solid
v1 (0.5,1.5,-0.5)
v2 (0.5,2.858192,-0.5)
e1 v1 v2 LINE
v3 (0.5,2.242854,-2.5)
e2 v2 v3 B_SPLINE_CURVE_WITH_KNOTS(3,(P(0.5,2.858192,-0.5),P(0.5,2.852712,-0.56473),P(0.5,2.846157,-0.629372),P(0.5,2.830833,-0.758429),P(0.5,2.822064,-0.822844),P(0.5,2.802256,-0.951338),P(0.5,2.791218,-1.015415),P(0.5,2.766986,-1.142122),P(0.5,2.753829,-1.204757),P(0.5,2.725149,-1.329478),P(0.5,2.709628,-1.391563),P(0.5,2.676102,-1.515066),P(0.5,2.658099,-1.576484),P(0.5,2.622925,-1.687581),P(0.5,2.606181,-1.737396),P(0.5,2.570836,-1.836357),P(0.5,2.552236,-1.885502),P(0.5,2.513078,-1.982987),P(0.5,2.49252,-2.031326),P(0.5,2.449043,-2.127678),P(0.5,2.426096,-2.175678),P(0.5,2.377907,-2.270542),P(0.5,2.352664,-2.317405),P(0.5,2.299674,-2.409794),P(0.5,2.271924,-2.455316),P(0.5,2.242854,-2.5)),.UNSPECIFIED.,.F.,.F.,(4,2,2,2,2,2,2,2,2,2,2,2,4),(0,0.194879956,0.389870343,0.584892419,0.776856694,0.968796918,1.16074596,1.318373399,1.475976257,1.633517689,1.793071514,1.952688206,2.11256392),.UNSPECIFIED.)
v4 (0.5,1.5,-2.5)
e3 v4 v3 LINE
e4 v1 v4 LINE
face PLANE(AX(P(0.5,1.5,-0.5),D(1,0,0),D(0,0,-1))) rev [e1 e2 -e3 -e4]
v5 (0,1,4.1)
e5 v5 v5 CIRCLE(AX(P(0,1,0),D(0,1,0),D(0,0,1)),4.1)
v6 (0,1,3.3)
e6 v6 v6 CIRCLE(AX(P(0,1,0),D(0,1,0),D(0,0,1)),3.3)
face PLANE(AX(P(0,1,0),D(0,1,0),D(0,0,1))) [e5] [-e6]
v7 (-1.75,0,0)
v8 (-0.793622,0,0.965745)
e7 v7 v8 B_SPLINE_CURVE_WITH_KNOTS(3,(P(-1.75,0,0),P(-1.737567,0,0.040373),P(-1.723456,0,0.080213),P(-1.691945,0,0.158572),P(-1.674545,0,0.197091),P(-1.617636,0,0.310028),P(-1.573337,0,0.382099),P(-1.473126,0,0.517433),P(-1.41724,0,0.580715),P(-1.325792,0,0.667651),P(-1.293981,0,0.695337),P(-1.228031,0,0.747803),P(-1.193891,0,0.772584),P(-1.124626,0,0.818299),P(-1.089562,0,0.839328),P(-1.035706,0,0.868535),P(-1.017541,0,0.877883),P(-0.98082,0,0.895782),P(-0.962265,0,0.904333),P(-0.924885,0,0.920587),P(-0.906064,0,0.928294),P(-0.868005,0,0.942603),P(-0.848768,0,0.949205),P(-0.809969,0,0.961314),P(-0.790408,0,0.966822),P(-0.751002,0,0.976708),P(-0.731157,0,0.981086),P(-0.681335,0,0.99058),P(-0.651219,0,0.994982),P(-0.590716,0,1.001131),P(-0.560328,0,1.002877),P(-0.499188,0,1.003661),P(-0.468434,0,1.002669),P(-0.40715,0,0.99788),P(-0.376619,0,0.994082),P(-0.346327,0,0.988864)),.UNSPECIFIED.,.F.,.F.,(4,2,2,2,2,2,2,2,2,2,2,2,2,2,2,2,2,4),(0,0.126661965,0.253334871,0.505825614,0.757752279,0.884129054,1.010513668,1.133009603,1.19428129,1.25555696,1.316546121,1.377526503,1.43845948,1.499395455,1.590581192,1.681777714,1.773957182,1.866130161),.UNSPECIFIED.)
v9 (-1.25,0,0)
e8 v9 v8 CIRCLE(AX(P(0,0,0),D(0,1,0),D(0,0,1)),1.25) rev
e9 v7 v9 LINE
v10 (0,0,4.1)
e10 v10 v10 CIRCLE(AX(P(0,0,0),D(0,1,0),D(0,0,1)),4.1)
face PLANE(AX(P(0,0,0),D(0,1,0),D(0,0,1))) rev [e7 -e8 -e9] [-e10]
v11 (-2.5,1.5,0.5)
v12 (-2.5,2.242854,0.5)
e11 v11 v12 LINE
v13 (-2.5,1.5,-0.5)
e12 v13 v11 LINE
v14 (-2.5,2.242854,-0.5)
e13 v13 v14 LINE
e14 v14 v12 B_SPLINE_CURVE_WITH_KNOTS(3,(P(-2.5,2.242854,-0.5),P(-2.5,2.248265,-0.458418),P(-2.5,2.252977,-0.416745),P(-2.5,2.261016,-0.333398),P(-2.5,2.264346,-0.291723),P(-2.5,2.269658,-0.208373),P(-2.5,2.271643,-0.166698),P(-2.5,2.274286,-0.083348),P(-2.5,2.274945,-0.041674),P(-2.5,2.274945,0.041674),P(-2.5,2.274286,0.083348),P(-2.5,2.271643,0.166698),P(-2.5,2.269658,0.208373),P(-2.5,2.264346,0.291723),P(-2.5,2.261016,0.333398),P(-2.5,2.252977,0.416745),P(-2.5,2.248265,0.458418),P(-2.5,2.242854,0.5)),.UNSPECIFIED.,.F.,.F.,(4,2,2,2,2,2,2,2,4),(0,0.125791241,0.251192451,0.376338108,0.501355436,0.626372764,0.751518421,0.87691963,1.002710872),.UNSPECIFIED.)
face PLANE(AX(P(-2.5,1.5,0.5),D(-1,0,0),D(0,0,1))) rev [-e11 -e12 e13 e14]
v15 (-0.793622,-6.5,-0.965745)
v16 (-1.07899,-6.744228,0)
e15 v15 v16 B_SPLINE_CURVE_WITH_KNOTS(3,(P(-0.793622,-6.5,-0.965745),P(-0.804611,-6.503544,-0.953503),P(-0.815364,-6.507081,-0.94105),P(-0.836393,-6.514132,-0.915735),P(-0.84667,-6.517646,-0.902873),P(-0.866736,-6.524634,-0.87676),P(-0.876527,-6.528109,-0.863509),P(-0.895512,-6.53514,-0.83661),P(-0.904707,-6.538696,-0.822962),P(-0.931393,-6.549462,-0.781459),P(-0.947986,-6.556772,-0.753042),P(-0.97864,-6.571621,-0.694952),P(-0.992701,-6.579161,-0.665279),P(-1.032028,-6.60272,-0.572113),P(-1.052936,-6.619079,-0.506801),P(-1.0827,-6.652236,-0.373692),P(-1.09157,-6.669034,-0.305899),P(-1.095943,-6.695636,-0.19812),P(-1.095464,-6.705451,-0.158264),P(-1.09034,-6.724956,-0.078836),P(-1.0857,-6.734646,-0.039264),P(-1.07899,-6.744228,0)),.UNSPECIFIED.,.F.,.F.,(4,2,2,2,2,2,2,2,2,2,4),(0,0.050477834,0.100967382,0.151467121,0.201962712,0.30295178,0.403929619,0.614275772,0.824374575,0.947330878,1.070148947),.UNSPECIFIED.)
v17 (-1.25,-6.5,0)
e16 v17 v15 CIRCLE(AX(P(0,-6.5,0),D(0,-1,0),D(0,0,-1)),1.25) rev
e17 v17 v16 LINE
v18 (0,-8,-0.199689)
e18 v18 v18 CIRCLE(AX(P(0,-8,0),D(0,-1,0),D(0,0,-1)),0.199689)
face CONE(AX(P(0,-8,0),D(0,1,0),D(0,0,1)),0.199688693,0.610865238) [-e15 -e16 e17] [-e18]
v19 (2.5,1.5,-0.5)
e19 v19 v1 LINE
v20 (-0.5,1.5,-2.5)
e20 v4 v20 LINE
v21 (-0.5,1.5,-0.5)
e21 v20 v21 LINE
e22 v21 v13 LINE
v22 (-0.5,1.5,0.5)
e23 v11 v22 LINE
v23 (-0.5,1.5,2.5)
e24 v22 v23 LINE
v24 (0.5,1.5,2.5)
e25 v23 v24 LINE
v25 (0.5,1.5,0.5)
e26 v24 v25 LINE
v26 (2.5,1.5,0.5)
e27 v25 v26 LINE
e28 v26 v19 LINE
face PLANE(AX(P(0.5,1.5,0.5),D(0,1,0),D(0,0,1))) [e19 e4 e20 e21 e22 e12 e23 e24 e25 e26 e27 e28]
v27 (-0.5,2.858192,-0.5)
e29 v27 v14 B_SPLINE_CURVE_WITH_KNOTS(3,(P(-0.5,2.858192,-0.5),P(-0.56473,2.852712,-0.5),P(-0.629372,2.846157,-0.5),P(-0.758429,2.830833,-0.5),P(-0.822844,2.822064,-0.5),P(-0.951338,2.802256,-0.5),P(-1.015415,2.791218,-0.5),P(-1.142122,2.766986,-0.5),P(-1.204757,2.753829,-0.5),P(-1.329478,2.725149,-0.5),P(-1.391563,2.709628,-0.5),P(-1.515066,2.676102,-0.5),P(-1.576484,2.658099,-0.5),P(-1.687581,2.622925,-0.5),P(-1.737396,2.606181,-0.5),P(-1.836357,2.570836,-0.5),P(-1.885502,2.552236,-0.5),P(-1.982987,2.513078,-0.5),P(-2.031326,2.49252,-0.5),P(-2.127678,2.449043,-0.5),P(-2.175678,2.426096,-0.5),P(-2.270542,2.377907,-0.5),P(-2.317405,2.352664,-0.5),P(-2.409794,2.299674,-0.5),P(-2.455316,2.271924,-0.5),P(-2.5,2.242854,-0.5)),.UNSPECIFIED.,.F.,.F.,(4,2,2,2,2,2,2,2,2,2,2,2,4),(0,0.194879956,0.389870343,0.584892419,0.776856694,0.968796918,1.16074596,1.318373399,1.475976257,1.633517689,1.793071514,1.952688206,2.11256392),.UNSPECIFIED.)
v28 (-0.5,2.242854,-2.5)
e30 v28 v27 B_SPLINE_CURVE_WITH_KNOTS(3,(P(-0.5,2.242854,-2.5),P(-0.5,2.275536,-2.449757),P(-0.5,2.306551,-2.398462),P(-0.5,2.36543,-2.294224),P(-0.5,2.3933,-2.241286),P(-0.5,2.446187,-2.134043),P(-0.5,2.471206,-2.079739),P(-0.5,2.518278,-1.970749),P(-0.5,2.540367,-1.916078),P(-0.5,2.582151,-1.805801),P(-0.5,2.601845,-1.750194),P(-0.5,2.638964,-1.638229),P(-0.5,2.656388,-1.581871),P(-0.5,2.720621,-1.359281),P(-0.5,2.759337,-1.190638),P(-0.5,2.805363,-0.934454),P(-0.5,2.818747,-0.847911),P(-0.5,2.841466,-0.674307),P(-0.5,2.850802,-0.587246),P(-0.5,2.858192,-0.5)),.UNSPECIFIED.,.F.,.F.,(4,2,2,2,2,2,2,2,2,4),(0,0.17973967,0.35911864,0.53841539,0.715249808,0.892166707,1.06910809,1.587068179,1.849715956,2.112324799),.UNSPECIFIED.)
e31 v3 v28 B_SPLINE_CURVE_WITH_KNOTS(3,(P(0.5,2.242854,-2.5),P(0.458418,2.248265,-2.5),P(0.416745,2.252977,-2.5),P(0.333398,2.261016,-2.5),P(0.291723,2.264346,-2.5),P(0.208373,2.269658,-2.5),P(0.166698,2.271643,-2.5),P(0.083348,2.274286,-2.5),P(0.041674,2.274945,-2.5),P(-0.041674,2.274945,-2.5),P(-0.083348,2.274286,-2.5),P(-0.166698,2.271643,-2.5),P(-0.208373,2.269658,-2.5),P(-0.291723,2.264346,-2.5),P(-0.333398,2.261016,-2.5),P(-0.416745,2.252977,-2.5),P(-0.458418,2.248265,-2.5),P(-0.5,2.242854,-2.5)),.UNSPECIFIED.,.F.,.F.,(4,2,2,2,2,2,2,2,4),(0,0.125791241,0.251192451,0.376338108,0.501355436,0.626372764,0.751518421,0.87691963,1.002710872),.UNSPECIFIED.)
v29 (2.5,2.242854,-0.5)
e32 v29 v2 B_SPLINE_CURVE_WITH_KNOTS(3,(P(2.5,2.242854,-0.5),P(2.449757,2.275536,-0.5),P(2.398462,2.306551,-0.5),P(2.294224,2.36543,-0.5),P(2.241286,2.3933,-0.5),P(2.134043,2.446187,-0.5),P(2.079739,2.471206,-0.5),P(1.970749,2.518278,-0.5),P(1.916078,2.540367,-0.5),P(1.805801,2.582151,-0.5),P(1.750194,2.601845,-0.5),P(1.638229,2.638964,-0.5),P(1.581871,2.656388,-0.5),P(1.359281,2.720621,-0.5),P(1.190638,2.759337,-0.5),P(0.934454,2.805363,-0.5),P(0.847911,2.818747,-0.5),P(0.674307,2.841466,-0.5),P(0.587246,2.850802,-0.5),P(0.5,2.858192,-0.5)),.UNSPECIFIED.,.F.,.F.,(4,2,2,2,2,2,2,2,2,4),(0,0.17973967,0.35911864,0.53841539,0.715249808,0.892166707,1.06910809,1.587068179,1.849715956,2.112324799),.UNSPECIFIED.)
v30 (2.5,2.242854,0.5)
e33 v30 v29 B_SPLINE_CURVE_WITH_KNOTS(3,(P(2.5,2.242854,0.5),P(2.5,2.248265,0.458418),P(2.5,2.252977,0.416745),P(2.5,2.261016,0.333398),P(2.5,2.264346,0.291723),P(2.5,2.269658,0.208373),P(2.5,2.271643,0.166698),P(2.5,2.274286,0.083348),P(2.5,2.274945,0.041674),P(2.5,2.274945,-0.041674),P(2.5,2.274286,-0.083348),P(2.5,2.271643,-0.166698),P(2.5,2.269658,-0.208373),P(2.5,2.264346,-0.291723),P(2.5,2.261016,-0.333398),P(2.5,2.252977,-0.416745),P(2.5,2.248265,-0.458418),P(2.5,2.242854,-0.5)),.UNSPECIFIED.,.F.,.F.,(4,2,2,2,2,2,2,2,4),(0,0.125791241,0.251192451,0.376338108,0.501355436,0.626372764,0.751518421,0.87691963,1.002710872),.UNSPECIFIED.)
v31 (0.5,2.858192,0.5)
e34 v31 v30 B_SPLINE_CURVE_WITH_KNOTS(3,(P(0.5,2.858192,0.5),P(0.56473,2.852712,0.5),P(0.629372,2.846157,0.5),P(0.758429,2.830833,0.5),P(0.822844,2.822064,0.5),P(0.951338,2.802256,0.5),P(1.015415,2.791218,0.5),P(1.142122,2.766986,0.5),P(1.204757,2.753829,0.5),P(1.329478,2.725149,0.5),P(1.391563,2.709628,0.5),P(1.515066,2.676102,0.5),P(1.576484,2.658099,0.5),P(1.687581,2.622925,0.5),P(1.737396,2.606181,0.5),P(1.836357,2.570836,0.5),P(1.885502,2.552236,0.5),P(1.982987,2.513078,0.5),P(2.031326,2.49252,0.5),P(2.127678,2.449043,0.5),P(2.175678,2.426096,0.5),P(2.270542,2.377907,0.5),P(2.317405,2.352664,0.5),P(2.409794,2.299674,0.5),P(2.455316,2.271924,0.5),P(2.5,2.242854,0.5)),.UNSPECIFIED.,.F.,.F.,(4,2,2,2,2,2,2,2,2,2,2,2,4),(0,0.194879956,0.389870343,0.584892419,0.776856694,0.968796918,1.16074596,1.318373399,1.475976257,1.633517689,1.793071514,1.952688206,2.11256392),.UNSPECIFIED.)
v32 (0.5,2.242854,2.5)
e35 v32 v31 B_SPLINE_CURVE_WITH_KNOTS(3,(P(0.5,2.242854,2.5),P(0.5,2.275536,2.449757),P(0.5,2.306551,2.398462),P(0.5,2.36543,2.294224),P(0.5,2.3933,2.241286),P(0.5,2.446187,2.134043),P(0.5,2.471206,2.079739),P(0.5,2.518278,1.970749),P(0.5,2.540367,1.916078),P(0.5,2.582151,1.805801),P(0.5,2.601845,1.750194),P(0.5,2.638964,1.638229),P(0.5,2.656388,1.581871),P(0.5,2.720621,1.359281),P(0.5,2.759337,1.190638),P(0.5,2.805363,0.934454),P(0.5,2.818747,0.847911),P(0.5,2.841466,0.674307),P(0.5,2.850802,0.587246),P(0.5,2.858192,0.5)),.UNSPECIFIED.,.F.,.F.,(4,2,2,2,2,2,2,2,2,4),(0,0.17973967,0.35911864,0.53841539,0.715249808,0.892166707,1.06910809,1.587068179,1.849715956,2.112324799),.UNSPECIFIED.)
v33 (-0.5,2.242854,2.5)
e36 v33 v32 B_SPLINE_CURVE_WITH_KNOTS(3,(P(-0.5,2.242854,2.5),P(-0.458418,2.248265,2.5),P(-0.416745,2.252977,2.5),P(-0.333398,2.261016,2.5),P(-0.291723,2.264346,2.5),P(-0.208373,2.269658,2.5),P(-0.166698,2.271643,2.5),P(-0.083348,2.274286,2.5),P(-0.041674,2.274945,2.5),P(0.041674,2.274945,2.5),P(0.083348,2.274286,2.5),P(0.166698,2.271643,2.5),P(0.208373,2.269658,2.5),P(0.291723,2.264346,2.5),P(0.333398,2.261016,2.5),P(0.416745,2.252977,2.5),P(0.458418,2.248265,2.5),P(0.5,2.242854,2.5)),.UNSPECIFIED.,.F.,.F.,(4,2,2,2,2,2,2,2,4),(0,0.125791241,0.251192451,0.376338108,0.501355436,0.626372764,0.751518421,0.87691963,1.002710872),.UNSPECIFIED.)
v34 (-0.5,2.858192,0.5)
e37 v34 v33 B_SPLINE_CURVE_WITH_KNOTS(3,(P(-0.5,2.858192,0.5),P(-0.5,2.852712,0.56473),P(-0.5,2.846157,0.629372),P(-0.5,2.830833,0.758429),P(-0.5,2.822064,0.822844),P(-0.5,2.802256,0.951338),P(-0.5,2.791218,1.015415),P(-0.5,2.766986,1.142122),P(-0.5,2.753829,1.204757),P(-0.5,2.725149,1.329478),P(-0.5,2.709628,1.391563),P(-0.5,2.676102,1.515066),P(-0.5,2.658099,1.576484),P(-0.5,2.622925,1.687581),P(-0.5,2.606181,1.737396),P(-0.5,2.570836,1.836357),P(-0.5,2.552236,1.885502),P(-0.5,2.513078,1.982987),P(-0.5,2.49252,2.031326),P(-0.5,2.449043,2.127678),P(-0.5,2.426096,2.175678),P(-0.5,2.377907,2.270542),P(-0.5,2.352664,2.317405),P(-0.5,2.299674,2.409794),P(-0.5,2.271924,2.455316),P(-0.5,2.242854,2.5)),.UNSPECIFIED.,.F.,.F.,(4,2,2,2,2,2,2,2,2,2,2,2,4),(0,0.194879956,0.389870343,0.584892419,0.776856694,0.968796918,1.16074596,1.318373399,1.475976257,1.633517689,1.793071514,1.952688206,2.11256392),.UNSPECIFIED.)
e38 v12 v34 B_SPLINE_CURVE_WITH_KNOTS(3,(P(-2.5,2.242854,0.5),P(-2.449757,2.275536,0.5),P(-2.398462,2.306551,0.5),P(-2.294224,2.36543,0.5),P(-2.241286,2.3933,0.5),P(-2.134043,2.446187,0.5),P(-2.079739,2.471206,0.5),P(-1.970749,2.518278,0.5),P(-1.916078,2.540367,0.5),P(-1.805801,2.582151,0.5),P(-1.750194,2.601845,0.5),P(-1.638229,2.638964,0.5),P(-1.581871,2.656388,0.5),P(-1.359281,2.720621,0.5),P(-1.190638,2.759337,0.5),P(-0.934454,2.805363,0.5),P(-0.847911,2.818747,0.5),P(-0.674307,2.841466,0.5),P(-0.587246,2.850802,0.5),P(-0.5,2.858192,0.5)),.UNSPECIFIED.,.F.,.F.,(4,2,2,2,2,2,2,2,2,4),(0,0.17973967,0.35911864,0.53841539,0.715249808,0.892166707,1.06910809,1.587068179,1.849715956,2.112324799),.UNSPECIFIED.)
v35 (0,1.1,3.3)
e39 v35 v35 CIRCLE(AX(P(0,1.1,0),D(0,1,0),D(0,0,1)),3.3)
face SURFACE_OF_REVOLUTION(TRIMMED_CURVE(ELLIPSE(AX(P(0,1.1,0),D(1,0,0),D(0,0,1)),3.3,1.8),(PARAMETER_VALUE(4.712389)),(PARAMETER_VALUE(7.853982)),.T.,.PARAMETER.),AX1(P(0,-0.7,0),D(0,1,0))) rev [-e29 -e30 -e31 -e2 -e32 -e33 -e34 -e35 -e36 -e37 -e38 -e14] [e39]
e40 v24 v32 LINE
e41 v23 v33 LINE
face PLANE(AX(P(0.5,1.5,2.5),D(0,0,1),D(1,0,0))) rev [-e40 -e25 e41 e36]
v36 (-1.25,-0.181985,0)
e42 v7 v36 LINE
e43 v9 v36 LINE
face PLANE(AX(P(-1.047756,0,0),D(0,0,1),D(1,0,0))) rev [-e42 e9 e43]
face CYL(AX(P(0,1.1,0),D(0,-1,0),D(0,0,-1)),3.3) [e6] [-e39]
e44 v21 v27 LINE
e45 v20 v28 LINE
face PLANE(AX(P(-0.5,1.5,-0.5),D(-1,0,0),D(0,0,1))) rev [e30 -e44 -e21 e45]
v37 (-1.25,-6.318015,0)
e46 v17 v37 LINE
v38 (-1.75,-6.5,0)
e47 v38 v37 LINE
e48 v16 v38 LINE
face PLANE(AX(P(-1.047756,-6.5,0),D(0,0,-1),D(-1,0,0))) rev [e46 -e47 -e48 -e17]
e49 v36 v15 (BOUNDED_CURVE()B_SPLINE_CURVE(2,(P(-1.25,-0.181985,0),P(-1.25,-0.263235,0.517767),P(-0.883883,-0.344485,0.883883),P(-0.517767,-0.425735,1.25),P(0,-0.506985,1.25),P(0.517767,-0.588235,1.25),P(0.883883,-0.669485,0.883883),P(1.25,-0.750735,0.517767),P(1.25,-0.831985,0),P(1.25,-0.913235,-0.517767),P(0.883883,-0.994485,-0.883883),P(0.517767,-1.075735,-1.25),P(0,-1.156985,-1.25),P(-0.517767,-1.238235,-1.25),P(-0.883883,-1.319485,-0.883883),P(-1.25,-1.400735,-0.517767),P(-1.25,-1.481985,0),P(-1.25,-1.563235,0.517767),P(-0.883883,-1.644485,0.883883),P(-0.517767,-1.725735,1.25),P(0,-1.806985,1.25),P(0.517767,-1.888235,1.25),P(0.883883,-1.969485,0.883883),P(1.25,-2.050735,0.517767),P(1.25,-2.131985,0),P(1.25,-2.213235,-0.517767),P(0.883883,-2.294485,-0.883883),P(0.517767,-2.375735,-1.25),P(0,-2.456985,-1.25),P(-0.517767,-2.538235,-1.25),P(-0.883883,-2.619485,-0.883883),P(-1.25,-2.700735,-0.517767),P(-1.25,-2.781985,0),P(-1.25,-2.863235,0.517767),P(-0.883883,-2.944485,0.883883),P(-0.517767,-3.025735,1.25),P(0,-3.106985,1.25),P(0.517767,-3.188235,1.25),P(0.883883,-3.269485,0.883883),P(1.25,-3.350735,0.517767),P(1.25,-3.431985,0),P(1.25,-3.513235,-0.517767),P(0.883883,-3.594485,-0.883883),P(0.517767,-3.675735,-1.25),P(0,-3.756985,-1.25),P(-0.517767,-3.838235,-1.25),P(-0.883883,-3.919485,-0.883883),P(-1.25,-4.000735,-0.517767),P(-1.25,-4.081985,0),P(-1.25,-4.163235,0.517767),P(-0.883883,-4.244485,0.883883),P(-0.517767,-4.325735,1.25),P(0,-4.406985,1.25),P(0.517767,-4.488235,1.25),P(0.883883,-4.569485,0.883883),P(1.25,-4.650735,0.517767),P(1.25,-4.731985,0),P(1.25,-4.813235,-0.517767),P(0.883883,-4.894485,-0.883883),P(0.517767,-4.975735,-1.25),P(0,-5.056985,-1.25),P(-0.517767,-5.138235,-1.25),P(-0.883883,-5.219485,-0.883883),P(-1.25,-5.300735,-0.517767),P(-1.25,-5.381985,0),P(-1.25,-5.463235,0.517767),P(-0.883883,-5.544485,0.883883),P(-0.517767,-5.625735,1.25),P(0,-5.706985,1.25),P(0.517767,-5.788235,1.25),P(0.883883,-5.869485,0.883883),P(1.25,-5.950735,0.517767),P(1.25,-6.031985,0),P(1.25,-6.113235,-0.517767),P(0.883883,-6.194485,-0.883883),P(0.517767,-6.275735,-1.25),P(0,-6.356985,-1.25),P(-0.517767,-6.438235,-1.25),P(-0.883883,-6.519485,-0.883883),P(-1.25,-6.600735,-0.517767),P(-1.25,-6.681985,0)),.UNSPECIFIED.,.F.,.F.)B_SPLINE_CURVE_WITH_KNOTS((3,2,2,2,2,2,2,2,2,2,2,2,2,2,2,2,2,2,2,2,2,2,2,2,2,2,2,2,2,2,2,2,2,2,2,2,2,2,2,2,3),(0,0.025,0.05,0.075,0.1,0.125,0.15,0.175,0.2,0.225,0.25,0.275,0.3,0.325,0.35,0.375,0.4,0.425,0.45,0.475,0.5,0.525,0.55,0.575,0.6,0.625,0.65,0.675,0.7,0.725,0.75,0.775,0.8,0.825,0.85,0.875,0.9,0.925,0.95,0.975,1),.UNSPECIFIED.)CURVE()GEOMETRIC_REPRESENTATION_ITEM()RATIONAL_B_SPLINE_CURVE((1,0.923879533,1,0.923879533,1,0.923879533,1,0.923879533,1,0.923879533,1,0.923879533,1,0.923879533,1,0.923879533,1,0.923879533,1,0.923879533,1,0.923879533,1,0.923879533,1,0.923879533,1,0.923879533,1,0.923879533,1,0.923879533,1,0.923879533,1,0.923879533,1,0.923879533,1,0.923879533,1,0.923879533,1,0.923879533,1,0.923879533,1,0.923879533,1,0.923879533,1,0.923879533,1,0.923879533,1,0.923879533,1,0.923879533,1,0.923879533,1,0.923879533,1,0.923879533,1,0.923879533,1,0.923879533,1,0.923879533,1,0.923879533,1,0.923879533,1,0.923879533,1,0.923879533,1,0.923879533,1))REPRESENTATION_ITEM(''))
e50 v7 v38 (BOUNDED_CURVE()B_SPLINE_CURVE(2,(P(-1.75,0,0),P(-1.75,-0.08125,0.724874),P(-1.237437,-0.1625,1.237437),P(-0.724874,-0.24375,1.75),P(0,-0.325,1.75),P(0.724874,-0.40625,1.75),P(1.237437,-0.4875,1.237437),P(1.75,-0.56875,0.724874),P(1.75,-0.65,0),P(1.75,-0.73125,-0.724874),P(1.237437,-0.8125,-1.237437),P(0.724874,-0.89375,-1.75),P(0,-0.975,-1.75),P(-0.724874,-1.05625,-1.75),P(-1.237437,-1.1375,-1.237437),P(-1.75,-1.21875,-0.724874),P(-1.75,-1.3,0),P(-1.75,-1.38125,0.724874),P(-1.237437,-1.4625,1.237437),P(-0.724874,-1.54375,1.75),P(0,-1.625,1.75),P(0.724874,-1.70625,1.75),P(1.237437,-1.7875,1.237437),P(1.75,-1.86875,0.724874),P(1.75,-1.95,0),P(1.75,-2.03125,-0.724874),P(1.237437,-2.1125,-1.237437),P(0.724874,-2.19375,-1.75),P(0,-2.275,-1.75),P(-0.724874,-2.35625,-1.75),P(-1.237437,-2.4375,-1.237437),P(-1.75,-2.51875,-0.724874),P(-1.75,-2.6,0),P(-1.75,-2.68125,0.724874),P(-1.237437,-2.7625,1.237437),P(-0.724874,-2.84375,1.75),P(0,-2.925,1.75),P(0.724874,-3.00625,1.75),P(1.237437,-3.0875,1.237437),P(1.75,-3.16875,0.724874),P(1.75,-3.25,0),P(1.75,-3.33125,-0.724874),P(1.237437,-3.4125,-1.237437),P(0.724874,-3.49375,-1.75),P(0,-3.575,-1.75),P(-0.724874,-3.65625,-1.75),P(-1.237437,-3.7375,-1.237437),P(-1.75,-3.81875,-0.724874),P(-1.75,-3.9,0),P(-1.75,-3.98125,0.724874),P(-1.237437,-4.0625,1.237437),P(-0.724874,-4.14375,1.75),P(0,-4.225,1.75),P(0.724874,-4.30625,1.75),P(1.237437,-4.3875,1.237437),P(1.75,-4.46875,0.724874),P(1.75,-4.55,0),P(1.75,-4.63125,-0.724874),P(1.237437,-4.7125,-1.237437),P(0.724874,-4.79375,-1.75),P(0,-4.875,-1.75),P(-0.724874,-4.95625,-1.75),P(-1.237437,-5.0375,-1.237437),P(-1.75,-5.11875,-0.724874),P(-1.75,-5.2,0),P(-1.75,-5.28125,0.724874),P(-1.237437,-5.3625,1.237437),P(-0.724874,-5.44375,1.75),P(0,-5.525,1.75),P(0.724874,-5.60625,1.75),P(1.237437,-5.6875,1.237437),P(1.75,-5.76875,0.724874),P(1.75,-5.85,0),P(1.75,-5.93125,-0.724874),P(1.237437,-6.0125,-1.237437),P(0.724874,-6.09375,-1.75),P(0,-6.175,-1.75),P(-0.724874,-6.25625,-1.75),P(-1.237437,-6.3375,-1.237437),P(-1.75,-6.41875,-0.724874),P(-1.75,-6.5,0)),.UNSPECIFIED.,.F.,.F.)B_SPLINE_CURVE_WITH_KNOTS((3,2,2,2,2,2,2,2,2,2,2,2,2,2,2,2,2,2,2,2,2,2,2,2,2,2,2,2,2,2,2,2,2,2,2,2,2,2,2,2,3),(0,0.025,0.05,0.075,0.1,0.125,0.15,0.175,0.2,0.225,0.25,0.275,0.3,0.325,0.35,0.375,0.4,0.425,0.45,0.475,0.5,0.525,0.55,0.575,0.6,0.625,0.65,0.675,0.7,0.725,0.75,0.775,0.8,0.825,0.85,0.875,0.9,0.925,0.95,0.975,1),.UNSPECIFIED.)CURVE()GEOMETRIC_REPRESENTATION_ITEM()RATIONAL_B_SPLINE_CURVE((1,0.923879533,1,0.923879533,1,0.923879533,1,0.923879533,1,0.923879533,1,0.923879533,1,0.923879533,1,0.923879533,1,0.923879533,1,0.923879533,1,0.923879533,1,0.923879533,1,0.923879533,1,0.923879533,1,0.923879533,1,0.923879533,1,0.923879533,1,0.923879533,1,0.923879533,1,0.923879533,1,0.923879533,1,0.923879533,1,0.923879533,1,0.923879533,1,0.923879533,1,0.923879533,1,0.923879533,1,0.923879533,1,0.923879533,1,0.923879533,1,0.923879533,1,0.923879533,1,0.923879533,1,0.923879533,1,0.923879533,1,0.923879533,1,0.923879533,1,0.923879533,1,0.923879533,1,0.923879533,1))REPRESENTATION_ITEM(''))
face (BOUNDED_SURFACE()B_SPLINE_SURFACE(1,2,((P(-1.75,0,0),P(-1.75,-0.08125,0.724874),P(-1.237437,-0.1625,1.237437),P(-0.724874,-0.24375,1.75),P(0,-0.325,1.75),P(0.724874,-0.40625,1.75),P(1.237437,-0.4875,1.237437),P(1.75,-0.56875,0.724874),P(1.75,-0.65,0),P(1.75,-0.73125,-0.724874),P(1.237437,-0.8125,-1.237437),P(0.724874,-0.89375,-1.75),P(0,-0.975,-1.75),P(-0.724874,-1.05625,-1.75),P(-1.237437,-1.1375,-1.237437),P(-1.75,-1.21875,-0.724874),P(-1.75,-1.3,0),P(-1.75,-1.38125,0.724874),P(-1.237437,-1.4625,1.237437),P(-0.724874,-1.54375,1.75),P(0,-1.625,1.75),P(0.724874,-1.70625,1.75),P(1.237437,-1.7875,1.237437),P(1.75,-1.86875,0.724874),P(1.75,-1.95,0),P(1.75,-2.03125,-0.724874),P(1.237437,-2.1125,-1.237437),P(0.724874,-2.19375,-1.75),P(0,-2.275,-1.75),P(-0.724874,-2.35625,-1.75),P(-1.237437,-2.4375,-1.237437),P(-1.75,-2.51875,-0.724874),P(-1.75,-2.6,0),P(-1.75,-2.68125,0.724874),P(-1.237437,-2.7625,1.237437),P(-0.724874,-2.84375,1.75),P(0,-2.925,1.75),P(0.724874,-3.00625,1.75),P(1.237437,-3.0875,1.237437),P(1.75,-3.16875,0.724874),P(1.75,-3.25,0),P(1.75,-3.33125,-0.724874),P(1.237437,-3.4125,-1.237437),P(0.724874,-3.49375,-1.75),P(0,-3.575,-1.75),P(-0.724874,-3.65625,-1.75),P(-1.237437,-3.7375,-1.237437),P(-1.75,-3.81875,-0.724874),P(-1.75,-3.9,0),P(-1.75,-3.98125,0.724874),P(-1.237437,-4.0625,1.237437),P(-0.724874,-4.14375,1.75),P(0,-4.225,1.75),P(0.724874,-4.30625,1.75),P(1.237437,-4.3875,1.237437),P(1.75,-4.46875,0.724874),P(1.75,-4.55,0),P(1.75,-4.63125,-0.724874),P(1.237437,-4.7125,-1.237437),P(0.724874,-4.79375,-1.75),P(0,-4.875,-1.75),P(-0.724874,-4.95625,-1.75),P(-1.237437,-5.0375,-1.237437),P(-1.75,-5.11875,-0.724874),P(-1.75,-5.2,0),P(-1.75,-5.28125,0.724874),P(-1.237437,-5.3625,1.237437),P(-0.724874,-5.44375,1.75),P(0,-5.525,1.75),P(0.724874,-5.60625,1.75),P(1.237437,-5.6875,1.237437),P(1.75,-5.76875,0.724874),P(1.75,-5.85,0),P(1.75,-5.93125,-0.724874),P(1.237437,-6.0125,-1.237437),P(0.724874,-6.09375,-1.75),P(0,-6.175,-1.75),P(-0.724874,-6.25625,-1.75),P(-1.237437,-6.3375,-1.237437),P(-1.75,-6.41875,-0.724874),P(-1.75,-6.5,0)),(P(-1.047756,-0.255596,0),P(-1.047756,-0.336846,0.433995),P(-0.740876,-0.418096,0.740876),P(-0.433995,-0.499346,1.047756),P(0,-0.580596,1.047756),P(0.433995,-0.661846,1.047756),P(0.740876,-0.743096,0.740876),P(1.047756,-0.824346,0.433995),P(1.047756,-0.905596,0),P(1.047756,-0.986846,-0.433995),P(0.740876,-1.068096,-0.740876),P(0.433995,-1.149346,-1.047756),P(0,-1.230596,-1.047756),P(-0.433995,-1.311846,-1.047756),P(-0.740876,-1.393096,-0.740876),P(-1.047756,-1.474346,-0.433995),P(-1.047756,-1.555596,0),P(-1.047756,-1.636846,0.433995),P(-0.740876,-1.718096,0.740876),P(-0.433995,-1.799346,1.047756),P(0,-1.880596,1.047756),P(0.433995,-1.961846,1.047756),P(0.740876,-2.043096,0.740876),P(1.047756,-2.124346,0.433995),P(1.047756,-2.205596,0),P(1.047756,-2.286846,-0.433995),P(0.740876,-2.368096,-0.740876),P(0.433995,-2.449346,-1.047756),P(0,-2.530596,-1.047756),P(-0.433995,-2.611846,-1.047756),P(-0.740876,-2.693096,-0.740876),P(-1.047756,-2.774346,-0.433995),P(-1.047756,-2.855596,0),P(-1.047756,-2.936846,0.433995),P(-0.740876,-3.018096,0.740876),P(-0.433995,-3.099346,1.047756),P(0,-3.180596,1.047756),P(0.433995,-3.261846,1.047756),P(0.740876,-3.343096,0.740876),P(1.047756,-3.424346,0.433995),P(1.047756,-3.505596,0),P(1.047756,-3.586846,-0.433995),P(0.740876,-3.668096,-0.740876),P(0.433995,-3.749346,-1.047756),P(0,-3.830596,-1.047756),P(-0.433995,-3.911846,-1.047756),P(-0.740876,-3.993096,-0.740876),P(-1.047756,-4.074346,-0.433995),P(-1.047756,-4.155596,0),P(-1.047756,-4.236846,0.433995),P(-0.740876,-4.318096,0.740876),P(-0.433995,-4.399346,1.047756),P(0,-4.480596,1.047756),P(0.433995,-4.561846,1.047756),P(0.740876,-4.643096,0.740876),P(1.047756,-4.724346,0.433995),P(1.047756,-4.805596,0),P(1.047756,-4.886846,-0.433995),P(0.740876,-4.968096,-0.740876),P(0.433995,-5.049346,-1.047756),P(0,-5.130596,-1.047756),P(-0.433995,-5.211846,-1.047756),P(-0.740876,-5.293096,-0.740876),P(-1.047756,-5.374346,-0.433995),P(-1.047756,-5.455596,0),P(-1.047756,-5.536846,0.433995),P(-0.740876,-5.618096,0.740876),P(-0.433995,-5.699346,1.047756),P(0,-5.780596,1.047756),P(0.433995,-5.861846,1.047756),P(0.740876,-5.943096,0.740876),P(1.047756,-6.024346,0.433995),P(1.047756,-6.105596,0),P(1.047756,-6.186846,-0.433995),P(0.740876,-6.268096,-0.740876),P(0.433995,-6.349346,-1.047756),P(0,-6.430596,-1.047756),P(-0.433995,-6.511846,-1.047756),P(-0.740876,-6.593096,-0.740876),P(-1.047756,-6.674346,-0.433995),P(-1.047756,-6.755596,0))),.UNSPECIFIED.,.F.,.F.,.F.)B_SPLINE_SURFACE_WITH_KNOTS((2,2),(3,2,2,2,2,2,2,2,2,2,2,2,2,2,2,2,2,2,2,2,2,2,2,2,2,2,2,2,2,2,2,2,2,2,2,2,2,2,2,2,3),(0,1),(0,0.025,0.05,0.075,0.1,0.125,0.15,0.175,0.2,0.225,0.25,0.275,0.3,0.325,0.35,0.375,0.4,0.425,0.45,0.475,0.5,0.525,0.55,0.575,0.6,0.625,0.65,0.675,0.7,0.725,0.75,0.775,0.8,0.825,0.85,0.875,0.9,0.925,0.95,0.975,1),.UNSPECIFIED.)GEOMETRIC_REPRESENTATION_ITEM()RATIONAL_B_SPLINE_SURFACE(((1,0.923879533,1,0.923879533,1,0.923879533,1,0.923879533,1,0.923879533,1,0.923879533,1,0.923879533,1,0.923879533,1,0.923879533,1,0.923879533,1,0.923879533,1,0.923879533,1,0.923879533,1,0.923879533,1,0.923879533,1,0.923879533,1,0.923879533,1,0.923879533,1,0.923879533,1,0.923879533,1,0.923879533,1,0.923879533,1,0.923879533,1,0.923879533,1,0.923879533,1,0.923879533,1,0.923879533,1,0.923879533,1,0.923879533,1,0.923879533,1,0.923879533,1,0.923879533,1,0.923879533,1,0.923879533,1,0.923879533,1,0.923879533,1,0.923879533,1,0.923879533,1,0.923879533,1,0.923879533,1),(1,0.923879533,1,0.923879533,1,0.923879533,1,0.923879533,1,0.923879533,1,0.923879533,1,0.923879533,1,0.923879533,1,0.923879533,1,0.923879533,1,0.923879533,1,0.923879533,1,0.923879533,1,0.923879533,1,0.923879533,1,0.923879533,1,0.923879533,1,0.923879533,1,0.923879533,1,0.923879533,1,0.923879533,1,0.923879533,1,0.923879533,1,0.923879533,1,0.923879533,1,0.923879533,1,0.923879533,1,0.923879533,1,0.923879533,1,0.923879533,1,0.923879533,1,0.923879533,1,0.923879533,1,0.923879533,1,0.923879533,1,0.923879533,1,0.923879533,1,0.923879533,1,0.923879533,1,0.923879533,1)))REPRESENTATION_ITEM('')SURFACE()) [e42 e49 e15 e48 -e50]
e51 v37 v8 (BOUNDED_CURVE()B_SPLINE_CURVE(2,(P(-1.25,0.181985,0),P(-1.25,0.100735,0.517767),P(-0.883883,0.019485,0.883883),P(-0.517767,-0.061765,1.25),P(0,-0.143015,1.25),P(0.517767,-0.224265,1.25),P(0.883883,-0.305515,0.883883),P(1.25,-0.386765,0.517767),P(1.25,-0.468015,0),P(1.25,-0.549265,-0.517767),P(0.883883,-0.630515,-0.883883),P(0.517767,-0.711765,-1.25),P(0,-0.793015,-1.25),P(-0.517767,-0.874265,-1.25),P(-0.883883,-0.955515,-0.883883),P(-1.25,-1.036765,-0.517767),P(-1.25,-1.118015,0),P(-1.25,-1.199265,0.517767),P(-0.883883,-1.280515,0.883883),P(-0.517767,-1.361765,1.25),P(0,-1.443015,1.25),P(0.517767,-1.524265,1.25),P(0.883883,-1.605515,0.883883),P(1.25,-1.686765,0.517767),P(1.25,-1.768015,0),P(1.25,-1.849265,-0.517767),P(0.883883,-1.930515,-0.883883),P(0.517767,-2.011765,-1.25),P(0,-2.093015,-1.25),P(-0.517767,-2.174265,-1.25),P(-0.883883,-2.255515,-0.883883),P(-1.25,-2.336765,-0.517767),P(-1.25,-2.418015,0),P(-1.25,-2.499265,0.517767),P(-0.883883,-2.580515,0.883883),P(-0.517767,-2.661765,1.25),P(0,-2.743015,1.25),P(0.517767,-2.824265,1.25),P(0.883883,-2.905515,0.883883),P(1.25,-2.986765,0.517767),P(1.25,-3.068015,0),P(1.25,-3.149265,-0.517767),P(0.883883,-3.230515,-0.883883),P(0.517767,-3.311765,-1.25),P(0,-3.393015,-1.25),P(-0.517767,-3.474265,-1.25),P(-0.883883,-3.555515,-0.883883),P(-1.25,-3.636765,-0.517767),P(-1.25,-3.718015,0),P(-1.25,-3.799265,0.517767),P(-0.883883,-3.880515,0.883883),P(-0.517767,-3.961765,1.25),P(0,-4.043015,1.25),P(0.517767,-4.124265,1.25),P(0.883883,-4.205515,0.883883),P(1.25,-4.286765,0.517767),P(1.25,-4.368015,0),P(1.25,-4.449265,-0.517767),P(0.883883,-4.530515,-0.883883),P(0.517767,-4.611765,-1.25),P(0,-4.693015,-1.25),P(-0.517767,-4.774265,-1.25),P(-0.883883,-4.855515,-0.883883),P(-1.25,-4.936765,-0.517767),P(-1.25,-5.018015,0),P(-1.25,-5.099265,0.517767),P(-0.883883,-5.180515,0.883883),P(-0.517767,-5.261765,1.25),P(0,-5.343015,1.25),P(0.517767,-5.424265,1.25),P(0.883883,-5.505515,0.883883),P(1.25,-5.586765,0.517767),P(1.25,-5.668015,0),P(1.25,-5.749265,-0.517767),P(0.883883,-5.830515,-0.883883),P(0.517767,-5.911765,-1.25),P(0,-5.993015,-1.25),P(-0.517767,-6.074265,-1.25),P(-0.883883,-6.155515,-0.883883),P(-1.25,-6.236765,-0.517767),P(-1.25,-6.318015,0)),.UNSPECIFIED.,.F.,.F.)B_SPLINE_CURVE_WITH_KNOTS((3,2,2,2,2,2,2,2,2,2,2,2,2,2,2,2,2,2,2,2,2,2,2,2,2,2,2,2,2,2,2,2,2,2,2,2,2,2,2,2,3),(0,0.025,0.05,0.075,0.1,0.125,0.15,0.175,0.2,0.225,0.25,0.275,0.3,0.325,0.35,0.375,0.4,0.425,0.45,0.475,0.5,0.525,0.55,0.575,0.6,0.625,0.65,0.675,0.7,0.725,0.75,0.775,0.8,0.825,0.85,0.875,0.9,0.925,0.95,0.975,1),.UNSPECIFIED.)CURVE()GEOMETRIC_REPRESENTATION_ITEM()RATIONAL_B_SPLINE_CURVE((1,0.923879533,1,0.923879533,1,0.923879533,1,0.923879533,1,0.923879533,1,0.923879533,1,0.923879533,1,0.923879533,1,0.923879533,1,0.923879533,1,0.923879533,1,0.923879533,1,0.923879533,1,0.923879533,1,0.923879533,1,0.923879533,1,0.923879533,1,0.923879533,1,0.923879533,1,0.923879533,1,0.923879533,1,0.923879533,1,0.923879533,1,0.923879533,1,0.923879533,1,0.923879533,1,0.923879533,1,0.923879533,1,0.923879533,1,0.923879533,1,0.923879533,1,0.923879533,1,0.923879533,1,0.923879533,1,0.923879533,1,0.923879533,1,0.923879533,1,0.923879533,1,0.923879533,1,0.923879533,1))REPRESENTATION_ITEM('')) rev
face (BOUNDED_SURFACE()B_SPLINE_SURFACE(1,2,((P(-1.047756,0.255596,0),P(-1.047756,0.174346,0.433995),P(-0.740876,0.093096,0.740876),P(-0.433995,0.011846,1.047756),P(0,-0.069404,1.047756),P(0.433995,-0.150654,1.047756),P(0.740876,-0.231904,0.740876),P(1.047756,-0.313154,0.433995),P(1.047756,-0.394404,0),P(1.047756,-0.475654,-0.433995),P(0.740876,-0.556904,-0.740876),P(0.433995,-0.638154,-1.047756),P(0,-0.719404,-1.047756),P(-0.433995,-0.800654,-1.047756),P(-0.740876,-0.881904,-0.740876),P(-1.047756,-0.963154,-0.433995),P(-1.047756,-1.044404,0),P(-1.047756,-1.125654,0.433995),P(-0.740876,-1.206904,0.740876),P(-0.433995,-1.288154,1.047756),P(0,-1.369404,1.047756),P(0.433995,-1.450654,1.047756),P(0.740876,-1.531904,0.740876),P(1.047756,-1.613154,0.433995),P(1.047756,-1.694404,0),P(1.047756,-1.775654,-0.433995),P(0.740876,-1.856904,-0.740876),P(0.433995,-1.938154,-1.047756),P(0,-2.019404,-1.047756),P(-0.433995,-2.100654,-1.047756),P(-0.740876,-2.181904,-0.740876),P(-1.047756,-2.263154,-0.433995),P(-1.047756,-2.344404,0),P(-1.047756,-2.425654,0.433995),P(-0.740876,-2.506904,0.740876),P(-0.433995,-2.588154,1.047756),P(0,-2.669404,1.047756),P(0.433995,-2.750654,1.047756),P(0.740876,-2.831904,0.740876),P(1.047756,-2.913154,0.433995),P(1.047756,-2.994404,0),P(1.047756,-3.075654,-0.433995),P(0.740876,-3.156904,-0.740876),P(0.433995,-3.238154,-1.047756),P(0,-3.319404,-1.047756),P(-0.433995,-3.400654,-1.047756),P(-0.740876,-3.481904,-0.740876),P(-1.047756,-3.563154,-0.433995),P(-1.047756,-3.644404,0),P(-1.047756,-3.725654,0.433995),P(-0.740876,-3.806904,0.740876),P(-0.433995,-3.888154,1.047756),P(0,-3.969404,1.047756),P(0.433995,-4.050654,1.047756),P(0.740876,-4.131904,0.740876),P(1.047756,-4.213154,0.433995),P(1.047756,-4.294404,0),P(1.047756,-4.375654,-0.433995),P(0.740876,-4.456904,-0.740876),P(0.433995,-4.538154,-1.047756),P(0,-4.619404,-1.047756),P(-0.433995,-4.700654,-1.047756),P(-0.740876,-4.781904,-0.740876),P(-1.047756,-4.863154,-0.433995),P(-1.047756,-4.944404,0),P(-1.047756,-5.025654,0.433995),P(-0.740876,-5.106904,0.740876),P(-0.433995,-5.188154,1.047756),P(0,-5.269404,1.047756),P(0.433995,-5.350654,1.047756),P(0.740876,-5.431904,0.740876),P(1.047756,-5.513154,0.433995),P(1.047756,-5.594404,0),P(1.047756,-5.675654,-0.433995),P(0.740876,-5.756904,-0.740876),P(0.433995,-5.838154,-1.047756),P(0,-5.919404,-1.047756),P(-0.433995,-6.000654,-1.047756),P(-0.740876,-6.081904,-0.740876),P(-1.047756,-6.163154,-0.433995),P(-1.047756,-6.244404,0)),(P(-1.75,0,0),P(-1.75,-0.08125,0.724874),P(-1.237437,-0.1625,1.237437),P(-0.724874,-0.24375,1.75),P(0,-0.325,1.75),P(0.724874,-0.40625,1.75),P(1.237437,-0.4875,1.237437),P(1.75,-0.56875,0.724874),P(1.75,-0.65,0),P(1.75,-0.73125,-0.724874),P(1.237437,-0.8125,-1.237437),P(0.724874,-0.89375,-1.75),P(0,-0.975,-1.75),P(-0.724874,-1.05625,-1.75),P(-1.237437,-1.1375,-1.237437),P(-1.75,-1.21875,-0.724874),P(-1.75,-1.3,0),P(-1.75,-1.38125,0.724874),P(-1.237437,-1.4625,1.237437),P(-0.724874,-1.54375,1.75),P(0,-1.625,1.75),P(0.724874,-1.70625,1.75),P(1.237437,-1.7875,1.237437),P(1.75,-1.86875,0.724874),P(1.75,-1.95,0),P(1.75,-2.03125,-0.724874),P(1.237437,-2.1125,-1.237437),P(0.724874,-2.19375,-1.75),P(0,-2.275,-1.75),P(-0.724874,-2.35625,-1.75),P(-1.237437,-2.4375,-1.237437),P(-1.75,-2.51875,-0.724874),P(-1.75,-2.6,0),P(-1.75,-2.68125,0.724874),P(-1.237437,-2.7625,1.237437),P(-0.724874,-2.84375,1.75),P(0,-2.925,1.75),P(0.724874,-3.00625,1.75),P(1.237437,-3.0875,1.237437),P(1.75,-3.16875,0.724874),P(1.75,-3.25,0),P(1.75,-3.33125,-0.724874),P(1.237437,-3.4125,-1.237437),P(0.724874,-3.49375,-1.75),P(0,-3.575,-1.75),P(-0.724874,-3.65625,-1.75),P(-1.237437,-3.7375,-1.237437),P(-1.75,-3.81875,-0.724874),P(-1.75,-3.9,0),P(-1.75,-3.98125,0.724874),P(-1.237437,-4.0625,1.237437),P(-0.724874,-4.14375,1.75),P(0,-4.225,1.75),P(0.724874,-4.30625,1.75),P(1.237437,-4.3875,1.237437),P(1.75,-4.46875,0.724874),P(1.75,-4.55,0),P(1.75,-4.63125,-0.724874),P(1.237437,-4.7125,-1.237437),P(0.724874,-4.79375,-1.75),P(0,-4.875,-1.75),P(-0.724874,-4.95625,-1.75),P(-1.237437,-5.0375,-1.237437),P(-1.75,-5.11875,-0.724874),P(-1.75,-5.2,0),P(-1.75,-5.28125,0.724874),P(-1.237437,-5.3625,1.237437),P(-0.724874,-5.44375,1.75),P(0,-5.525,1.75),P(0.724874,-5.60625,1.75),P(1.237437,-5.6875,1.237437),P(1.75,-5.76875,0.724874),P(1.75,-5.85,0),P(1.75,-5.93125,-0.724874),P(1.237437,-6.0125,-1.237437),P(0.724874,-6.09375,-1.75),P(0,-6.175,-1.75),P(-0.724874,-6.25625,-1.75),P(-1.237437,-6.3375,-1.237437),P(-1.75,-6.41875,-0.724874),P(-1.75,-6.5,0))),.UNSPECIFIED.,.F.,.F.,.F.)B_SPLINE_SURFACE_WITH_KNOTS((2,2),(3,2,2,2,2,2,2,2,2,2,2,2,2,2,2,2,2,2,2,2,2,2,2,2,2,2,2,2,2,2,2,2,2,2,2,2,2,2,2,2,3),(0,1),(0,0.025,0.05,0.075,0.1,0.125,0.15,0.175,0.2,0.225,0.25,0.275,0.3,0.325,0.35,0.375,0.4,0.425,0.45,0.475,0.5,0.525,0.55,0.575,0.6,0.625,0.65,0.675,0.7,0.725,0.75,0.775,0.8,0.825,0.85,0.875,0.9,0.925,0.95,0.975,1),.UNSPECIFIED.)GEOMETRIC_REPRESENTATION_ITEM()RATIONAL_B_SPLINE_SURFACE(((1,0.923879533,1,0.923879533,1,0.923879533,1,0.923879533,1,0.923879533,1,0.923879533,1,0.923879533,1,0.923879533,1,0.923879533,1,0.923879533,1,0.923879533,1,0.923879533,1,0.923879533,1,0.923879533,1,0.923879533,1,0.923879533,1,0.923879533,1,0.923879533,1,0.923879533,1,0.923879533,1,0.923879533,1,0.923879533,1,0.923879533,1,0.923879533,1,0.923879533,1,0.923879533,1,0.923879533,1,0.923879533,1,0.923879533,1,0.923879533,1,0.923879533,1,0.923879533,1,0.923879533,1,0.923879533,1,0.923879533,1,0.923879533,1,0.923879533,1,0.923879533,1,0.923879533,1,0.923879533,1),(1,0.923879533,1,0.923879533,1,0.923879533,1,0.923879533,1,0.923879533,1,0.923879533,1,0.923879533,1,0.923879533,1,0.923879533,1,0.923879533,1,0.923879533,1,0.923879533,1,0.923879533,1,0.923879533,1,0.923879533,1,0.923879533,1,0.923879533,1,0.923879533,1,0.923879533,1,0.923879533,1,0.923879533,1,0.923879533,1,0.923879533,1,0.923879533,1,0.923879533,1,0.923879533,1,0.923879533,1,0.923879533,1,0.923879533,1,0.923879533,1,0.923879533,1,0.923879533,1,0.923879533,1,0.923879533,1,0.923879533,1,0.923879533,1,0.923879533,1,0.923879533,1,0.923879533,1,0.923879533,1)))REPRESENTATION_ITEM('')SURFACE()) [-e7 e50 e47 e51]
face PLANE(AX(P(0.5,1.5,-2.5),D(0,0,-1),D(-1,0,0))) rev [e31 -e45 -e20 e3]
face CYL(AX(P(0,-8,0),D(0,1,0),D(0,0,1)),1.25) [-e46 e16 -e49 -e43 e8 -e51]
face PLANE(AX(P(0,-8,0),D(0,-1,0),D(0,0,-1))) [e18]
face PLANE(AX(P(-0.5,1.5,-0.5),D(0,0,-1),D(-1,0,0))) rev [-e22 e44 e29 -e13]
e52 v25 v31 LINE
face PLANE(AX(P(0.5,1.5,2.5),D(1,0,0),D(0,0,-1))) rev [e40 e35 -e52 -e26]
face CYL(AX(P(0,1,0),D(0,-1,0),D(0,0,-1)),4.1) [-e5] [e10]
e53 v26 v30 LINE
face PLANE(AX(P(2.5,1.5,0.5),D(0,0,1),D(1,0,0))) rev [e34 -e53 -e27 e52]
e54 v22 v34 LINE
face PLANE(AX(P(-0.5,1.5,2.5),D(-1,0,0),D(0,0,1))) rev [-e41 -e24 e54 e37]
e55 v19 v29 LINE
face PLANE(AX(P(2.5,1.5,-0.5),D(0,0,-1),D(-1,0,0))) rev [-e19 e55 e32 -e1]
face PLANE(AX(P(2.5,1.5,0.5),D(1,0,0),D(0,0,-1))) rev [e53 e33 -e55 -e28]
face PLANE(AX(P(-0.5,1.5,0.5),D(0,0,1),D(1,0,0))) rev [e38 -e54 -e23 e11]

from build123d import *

# Parameters (mm, degrees)
SKETCH1_R           = 4.1
BOSS_EXTRUDE1_DEPTH = 1
SKETCH2_R           = 3.3
BOSS_EXTRUDE2_DEPTH = 0.1
DOME1_FACE_RADIUS   = 3.3
DOME1_HEIGHT        = 1.8
CUT_EXTRUDE1_DEPTH  = 3.5
SKETCH4_R           = 1.25
BOSS_EXTRUDE3_DEPTH = 8
CHAMFER1_SIZE       = 1.5
CHAMFER1_SIZE2      = 1.050311307
SWEEP1_PITCH        = 1.3


with BuildPart() as part:
    # Sketch1 → Boss-Extrude1 (new body)
    with BuildSketch(Plane(origin=(0, 0, 0), x_dir=(1, 0, 0), z_dir=(0, 1, 0))):
        with Locations(Location((0, 0, 0), (0, 0, 270))):
            Circle(SKETCH1_R)
    extrude(amount=BOSS_EXTRUDE1_DEPTH)

    # Sketch2 → Boss-Extrude2 (add)
    with BuildSketch(Plane(origin=(0, 1, 0), x_dir=(1, 0, 0), z_dir=(0, 1, 0))):
        with Locations(Location((0, 0, 0), (0, 0, 270))):
            Circle(SKETCH2_R)
    extrude(amount=BOSS_EXTRUDE2_DEPTH)

    # Dome1: an elliptical dome of height H over a round flat face of radius A is half a spheroid: the quarter ellipse of half axes A and H revolved about the face's axis
    with BuildSketch(Plane((0, 1.1, 0), x_dir=(0, 0, -1), z_dir=(1, 0, 0)), mode=Mode.PRIVATE) as dome1_quarter:
        Ellipse(DOME1_FACE_RADIUS, DOME1_HEIGHT)
        Rectangle(DOME1_FACE_RADIUS, DOME1_HEIGHT, align=(Align.MIN, Align.MIN), mode=Mode.INTERSECT)
    revolve(dome1_quarter.sketch, axis=Axis((0, 1.1, 0), (0, 1, 0)))

    # Sketch3 → Cut-Extrude1 (cut)
    with BuildSketch(Plane(origin=(0, 5, 0), x_dir=(-1, 0, 0), z_dir=(0, 1, 0))):
        Polygon((-0.5, 2.5), (0.5, 2.5), (0.5, 0.5), (2.5, 0.5), (2.5, -0.5), (0.5, -0.5), (0.5, -2.5), (-0.5, -2.5), (-0.5, -0.5), (-2.5, -0.5), (-2.5, 0.5), (-0.5, 0.5), align=None)
    extrude(amount=-CUT_EXTRUDE1_DEPTH, mode=Mode.SUBTRACT)

    # Sketch4 → Boss-Extrude3 (add)
    with BuildSketch(Plane.XZ):
        with Locations(Location((0, 0, 0), (0, 0, 90))):
            Circle(SKETCH4_R)
    extrude(amount=BOSS_EXTRUDE3_DEPTH)

    # Chamfer1
    chamfer1_edges = [part.edges().sort_by_distance(p)[0] for p in [
        (0, -8, -1.25),
    ]]
    chamfer1_side = [part.faces().sort_by_distance(p)[0] for p in [
        (0, -4, -1.25),
    ]]
    chamfer(chamfer1_edges, length=CHAMFER1_SIZE, length2=CHAMFER1_SIZE2, reference=chamfer1_side[0])

    # Sweep1: the profile of Sketch6 screwed along a left-hand helix of 5 turns, 8 arcs to a turn; built about Z, then put on its axis
    sweep1_z = Axis((0, 0, 0), (0, 0, 1))
    sweep1_corners = [(1.75, 0, 0), (1.047756447, 0, -0.25559575), (1.047756447, 0, 0.25559575)]
    with BuildLine(mode=Mode.PRIVATE) as sweep1_profile:
        Line(sweep1_corners[0], sweep1_corners[1])
        Line(sweep1_corners[1], sweep1_corners[2])
        Line(sweep1_corners[2], sweep1_corners[0])
    sweep1_cap = Face(sweep1_profile.wire())
    sweep1_turn_angles = [0, -22.5, -45, -67.5, -90, -112.5, -135, -157.5, -180, -202.5, -225, -247.5, -270, -292.5, -315, -337.5, -360]
    sweep1_turn_weights = [1, 0.9238795325112867, 1, 0.9238795325112867, 1, 0.9238795325112867, 1, 0.9238795325112867, 1, 0.9238795325112867, 1, 0.9238795325112867, 1, 0.9238795325112867, 1, 0.9238795325112867, 1]
    sweep1_turn_rails = [Edge.make_bspline([Vector(p[0], p[1], 0).rotate(sweep1_z, sweep1_turn_angles[k]) / sweep1_turn_weights[k] + Vector(0, 0, p[2] + -SWEEP1_PITCH * sweep1_turn_angles[k] / 360) for k in range(17)], [0, 0, 0, 1, 1, 2, 2, 3, 3, 4, 4, 5, 5, 6, 6, 7, 7, 8, 8, 8], 2, sweep1_turn_weights) for p in sweep1_corners]
    sweep1_turn_sides = [Face.make_surface_from_curves(sweep1_turn_rails[p[0]], sweep1_turn_rails[p[1]]) for p in [(0, 1), (1, 2), (2, 0)]]
    sweep1 = Plane(origin=(0, 0, 0), x_dir=(-1, 0, 0), z_dir=(0, -1, 0)) * Solid(Shell([*[p.moved(Location((0, 0, SWEEP1_PITCH * i))) for i in range(5) for p in sweep1_turn_sides], sweep1_cap, sweep1_cap.rotate(sweep1_z, -1800).moved(Location((0, 0, -SWEEP1_PITCH * -1800 / 360)))]))
    add(sweep1)


solid = part.part
